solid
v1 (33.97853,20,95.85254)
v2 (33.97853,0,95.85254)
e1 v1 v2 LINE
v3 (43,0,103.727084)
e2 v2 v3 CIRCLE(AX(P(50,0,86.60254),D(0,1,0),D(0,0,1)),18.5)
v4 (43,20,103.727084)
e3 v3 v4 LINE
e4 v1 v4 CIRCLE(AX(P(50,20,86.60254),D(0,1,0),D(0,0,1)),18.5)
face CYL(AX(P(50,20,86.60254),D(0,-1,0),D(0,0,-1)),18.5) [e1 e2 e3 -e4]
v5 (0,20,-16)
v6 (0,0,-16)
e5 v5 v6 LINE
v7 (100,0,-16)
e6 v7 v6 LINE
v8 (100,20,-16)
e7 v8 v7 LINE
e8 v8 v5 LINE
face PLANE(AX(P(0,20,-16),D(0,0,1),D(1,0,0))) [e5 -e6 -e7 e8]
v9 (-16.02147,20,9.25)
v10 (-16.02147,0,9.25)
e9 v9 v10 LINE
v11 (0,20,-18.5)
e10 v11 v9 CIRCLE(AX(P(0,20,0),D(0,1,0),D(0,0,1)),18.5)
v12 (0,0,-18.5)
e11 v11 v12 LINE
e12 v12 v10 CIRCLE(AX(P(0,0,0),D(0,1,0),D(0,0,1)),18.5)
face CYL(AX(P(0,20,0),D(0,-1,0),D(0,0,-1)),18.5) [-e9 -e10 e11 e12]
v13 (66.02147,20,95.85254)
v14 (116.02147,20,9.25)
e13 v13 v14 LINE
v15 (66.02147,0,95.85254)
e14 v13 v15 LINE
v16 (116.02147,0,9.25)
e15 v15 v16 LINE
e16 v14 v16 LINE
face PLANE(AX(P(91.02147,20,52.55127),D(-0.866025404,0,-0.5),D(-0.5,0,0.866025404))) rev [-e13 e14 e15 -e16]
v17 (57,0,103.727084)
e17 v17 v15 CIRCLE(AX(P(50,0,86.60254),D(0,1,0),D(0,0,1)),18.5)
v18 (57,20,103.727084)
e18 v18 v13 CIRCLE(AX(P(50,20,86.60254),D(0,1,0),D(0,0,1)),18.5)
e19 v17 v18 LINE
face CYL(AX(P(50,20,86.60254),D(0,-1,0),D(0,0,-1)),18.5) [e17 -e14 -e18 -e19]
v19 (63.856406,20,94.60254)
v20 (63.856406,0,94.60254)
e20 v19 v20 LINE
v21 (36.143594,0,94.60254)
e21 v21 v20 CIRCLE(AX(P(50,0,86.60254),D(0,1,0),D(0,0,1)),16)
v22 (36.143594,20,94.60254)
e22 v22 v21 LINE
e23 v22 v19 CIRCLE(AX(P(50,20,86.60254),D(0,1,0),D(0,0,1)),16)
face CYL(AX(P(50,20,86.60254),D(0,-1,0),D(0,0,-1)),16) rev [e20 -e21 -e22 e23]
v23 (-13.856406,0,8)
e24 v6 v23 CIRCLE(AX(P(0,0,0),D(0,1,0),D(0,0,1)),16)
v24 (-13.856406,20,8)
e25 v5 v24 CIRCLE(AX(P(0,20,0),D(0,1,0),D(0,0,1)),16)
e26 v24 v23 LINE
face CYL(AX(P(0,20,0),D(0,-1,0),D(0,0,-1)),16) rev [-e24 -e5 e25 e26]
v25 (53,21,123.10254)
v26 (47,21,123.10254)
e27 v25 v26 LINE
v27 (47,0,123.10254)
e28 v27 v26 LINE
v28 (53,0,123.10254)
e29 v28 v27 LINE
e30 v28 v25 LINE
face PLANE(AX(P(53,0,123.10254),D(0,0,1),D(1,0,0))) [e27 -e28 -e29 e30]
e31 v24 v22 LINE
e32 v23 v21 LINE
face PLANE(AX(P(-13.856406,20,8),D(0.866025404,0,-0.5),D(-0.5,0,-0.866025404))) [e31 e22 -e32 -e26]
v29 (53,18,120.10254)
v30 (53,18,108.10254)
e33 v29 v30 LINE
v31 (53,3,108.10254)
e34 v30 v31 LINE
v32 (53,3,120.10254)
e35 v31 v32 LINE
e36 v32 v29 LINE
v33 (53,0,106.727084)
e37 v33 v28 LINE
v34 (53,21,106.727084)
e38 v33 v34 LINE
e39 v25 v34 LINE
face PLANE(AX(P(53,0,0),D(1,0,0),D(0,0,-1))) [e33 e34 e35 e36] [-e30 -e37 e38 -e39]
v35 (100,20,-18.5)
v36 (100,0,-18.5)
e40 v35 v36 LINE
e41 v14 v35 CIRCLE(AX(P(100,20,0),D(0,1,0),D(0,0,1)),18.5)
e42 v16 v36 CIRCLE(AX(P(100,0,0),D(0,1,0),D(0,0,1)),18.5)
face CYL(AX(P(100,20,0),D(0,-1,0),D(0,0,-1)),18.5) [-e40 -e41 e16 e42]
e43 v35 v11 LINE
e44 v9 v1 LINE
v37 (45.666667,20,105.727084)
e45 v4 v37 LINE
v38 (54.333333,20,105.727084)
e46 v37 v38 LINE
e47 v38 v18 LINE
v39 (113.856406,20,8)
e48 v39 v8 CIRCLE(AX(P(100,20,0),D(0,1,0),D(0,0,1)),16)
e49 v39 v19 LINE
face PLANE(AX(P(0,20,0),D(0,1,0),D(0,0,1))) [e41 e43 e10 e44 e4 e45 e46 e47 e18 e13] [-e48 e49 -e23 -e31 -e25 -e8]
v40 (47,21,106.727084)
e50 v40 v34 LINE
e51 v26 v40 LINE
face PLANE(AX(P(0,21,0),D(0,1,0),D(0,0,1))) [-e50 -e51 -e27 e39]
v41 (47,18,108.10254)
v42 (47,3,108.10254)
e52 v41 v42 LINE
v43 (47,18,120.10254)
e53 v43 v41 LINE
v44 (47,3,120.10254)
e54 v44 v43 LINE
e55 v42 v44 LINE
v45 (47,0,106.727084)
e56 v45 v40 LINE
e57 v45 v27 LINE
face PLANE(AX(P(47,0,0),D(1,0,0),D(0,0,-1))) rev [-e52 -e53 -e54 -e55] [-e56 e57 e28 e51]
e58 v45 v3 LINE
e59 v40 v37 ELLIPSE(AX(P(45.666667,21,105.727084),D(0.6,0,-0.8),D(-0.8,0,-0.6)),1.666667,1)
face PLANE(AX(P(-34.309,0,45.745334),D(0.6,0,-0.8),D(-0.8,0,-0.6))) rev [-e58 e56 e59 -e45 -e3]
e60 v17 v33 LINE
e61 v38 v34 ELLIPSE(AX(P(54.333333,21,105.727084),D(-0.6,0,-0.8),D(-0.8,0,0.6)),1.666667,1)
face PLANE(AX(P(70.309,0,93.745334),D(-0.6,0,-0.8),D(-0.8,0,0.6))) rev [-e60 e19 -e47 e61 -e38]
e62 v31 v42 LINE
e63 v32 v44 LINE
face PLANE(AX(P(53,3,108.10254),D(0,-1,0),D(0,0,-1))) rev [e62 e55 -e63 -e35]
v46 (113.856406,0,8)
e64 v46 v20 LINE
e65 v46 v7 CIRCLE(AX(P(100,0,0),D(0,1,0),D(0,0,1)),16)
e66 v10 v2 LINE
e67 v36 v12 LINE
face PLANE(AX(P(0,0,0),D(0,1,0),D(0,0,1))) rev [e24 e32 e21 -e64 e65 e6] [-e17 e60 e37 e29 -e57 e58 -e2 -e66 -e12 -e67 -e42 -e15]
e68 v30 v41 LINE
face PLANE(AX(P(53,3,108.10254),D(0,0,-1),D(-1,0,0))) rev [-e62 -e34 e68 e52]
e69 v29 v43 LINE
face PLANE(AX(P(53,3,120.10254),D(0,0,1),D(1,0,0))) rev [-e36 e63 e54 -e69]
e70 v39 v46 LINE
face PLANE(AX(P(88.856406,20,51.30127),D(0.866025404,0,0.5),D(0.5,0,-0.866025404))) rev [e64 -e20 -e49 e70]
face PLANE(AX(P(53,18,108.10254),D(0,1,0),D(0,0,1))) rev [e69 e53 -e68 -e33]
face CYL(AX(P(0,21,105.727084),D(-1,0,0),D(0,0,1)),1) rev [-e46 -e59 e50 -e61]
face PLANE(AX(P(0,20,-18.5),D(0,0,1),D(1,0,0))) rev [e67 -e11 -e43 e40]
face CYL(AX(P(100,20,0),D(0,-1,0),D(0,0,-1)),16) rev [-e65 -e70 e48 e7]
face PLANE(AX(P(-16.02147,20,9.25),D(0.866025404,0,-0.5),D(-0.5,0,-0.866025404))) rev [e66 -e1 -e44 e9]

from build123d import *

# Parameters (mm, degrees)
BOSS_EXTRUDE1_DEPTH      = 20
BOSS_EXTRUDE2_DEPTH      = 3
BOSS_EXTRUDE2_DEPTH_BACK = 3
SKETCH2_W                = 18
SKETCH2_H                = 21
SKETCH2_W_2              = 12
SKETCH2_H_2              = 15
BOSS_EXTRUDE3_DEPTH      = 21
CUT_EXTRUDE1_DEPTH       = 30
CUT_EXTRUDE1_DEPTH_BACK  = 30
SKETCH4_W                = 3
SKETCH4_H                = 1
FILLET1_R                = 1


with BuildPart() as part:
    # Sketch1 → Boss-Extrude1 (new body)
    with BuildSketch(Plane(origin=(0, 0, 0), x_dir=(1, 0, 0), z_dir=(0, 1, 0))):
        with BuildLine():
            Line((31.500049634, -86.559686407), (-9.212862555, -16.042853971))
            ThreePointArc((-9.212862555, -16.042853971), (-13.066315501, -13.096617855), (-16.02146997, -9.25))
            Line((-16.02146997, -9.25), (33.97853003, -95.852540378))
            ThreePointArc((33.97853003, -95.852540378), (32.124838484, -91.369992609), (31.500049634, -86.559686407))
        make_face()
        with BuildLine():
            Line((36.143593539, -94.602540378), (31.500049634, -86.559686407))
            ThreePointArc((31.500049634, -86.559686407), (32.124838484, -91.369992609), (33.97853003, -95.852540378))
            ThreePointArc((33.97853003, -95.852540378), (50, -105.102540378), (66.02146997, -95.852540378))
            ThreePointArc((66.02146997, -95.852540378), (67.869627786, -91.390692713), (68.5, -86.602540378))
            ThreePointArc((68.5, -86.602540378), (68.499987591, -86.581113379), (68.499950366, -86.559686407))
            Line((68.499950366, -86.559686407), (63.856406461, -94.602540378))
            ThreePointArc((63.856406461, -94.602540378), (50, -102.602540378), (36.143593539, -94.602540378))
        make_face()
        with BuildLine():
            ThreePointArc((116.02146997, -9.25), (113.066315501, -13.096617855), (109.212862555, -16.042853971))
            Line((109.212862555, -16.042853971), (68.499950366, -86.559686407))
            ThreePointArc((68.499950366, -86.559686407), (68.499987591, -86.581113379), (68.5, -86.602540378))
            ThreePointArc((68.5, -86.602540378), (67.869627786, -91.390692713), (66.02146997, -95.852540378))
            Line((66.02146997, -95.852540378), (116.02146997, -9.25))
        make_face()
        with BuildLine():
            ThreePointArc((100, 18.5), (95.191153985, 17.864070085), (90.712912189, 16))
            Line((90.712912189, 16), (100, 16))
            ThreePointArc((100, 16), (111.313708499, 11.313708499), (116, 0))
            ThreePointArc((116, 0), (115.454813221, -4.141104722), (113.856406461, -8))
            Line((113.856406461, -8), (109.212862555, -16.042853971))
            ThreePointArc((109.212862555, -16.042853971), (113.066315501, -13.096617855), (116.02146997, -9.25))
            ThreePointArc((116.02146997, -9.25), (117.869627786, -4.788152334), (118.5, 0))
            ThreePointArc((118.5, 0), (113.081475452, 13.081475452), (100, 18.5))
        make_face()
        with BuildLine():
            ThreePointArc((0, 18.5), (4.808846015, 17.864070085), (9.287087811, 16))
            Line((9.287087811, 16), (90.712912189, 16))
            ThreePointArc((90.712912189, 16), (95.191153985, 17.864070085), (100, 18.5))
            Line((100, 18.5), (0, 18.5))
        make_face()
        with BuildLine():
            ThreePointArc((-13.856406461, -8), (-13.856406461, 8), (0, 16))
            Line((0, 16), (9.287087811, 16))
            ThreePointArc((9.287087811, 16), (4.808846015, 17.864070085), (0, 18.5))
            ThreePointArc((0, 18.5), (-16.02146997, 9.25), (-16.02146997, -9.25))
            ThreePointArc((-16.02146997, -9.25), (-13.066315501, -13.096617855), (-9.212862555, -16.042853971))
            Line((-9.212862555, -16.042853971), (-13.856406461, -8))
        make_face()
    extrude(amount=BOSS_EXTRUDE1_DEPTH)



with BuildPart() as body_2:
    # Sketch2 → Boss-Extrude2 (new, two sides: drawn at the far end of the back side and taken through both)
    with BuildSketch(Plane.ZY.offset(-50).offset(-BOSS_EXTRUDE2_DEPTH_BACK)):
        with Locations((114.102540378, 10.5)):
            Rectangle(SKETCH2_W, SKETCH2_H)
        with Locations((114.102540378, 10.5)):
            Rectangle(SKETCH2_W_2, SKETCH2_H_2, mode=Mode.SUBTRACT)
    extrude(amount=BOSS_EXTRUDE2_DEPTH + BOSS_EXTRUDE2_DEPTH_BACK)


with BuildPart() as part_1:
    add(part.part)

    add(body_2.part)  # Boss-Extrude3 merges body 2
    # Sketch3 → Boss-Extrude3 (add)
    with BuildSketch(Plane(origin=(0, 21, 0), x_dir=(1, 0, 0), z_dir=(0, 1, 0))):
        Polygon((43, -103.727084168), (47, -106.727084168), (47, -105.102540378), (53, -105.102540378), (53, -106.727084168), (57, -103.727084168), align=None)
    extrude(amount=-BOSS_EXTRUDE3_DEPTH)

    # Sketch4 → Cut-Extrude1 (cut, two sides: drawn at the far end of the back side and taken through both)
    with BuildSketch(Plane.ZY.offset(-50).offset(-CUT_EXTRUDE1_DEPTH_BACK)):
        with Locations((105.227084168, 20.5)):
            Rectangle(SKETCH4_W, SKETCH4_H)
    extrude(amount=CUT_EXTRUDE1_DEPTH + CUT_EXTRUDE1_DEPTH_BACK, mode=Mode.SUBTRACT)

    # Fillet1
    fillet1_edges = [part_1.edges().sort_by_distance(p)[0] for p in [
        (50, 20, 106.727084168),
    ]]
    fillet(fillet1_edges, radius=FILLET1_R - 0.0001)  # a hair under: the kernel refuses the full size


solid = part_1.part
